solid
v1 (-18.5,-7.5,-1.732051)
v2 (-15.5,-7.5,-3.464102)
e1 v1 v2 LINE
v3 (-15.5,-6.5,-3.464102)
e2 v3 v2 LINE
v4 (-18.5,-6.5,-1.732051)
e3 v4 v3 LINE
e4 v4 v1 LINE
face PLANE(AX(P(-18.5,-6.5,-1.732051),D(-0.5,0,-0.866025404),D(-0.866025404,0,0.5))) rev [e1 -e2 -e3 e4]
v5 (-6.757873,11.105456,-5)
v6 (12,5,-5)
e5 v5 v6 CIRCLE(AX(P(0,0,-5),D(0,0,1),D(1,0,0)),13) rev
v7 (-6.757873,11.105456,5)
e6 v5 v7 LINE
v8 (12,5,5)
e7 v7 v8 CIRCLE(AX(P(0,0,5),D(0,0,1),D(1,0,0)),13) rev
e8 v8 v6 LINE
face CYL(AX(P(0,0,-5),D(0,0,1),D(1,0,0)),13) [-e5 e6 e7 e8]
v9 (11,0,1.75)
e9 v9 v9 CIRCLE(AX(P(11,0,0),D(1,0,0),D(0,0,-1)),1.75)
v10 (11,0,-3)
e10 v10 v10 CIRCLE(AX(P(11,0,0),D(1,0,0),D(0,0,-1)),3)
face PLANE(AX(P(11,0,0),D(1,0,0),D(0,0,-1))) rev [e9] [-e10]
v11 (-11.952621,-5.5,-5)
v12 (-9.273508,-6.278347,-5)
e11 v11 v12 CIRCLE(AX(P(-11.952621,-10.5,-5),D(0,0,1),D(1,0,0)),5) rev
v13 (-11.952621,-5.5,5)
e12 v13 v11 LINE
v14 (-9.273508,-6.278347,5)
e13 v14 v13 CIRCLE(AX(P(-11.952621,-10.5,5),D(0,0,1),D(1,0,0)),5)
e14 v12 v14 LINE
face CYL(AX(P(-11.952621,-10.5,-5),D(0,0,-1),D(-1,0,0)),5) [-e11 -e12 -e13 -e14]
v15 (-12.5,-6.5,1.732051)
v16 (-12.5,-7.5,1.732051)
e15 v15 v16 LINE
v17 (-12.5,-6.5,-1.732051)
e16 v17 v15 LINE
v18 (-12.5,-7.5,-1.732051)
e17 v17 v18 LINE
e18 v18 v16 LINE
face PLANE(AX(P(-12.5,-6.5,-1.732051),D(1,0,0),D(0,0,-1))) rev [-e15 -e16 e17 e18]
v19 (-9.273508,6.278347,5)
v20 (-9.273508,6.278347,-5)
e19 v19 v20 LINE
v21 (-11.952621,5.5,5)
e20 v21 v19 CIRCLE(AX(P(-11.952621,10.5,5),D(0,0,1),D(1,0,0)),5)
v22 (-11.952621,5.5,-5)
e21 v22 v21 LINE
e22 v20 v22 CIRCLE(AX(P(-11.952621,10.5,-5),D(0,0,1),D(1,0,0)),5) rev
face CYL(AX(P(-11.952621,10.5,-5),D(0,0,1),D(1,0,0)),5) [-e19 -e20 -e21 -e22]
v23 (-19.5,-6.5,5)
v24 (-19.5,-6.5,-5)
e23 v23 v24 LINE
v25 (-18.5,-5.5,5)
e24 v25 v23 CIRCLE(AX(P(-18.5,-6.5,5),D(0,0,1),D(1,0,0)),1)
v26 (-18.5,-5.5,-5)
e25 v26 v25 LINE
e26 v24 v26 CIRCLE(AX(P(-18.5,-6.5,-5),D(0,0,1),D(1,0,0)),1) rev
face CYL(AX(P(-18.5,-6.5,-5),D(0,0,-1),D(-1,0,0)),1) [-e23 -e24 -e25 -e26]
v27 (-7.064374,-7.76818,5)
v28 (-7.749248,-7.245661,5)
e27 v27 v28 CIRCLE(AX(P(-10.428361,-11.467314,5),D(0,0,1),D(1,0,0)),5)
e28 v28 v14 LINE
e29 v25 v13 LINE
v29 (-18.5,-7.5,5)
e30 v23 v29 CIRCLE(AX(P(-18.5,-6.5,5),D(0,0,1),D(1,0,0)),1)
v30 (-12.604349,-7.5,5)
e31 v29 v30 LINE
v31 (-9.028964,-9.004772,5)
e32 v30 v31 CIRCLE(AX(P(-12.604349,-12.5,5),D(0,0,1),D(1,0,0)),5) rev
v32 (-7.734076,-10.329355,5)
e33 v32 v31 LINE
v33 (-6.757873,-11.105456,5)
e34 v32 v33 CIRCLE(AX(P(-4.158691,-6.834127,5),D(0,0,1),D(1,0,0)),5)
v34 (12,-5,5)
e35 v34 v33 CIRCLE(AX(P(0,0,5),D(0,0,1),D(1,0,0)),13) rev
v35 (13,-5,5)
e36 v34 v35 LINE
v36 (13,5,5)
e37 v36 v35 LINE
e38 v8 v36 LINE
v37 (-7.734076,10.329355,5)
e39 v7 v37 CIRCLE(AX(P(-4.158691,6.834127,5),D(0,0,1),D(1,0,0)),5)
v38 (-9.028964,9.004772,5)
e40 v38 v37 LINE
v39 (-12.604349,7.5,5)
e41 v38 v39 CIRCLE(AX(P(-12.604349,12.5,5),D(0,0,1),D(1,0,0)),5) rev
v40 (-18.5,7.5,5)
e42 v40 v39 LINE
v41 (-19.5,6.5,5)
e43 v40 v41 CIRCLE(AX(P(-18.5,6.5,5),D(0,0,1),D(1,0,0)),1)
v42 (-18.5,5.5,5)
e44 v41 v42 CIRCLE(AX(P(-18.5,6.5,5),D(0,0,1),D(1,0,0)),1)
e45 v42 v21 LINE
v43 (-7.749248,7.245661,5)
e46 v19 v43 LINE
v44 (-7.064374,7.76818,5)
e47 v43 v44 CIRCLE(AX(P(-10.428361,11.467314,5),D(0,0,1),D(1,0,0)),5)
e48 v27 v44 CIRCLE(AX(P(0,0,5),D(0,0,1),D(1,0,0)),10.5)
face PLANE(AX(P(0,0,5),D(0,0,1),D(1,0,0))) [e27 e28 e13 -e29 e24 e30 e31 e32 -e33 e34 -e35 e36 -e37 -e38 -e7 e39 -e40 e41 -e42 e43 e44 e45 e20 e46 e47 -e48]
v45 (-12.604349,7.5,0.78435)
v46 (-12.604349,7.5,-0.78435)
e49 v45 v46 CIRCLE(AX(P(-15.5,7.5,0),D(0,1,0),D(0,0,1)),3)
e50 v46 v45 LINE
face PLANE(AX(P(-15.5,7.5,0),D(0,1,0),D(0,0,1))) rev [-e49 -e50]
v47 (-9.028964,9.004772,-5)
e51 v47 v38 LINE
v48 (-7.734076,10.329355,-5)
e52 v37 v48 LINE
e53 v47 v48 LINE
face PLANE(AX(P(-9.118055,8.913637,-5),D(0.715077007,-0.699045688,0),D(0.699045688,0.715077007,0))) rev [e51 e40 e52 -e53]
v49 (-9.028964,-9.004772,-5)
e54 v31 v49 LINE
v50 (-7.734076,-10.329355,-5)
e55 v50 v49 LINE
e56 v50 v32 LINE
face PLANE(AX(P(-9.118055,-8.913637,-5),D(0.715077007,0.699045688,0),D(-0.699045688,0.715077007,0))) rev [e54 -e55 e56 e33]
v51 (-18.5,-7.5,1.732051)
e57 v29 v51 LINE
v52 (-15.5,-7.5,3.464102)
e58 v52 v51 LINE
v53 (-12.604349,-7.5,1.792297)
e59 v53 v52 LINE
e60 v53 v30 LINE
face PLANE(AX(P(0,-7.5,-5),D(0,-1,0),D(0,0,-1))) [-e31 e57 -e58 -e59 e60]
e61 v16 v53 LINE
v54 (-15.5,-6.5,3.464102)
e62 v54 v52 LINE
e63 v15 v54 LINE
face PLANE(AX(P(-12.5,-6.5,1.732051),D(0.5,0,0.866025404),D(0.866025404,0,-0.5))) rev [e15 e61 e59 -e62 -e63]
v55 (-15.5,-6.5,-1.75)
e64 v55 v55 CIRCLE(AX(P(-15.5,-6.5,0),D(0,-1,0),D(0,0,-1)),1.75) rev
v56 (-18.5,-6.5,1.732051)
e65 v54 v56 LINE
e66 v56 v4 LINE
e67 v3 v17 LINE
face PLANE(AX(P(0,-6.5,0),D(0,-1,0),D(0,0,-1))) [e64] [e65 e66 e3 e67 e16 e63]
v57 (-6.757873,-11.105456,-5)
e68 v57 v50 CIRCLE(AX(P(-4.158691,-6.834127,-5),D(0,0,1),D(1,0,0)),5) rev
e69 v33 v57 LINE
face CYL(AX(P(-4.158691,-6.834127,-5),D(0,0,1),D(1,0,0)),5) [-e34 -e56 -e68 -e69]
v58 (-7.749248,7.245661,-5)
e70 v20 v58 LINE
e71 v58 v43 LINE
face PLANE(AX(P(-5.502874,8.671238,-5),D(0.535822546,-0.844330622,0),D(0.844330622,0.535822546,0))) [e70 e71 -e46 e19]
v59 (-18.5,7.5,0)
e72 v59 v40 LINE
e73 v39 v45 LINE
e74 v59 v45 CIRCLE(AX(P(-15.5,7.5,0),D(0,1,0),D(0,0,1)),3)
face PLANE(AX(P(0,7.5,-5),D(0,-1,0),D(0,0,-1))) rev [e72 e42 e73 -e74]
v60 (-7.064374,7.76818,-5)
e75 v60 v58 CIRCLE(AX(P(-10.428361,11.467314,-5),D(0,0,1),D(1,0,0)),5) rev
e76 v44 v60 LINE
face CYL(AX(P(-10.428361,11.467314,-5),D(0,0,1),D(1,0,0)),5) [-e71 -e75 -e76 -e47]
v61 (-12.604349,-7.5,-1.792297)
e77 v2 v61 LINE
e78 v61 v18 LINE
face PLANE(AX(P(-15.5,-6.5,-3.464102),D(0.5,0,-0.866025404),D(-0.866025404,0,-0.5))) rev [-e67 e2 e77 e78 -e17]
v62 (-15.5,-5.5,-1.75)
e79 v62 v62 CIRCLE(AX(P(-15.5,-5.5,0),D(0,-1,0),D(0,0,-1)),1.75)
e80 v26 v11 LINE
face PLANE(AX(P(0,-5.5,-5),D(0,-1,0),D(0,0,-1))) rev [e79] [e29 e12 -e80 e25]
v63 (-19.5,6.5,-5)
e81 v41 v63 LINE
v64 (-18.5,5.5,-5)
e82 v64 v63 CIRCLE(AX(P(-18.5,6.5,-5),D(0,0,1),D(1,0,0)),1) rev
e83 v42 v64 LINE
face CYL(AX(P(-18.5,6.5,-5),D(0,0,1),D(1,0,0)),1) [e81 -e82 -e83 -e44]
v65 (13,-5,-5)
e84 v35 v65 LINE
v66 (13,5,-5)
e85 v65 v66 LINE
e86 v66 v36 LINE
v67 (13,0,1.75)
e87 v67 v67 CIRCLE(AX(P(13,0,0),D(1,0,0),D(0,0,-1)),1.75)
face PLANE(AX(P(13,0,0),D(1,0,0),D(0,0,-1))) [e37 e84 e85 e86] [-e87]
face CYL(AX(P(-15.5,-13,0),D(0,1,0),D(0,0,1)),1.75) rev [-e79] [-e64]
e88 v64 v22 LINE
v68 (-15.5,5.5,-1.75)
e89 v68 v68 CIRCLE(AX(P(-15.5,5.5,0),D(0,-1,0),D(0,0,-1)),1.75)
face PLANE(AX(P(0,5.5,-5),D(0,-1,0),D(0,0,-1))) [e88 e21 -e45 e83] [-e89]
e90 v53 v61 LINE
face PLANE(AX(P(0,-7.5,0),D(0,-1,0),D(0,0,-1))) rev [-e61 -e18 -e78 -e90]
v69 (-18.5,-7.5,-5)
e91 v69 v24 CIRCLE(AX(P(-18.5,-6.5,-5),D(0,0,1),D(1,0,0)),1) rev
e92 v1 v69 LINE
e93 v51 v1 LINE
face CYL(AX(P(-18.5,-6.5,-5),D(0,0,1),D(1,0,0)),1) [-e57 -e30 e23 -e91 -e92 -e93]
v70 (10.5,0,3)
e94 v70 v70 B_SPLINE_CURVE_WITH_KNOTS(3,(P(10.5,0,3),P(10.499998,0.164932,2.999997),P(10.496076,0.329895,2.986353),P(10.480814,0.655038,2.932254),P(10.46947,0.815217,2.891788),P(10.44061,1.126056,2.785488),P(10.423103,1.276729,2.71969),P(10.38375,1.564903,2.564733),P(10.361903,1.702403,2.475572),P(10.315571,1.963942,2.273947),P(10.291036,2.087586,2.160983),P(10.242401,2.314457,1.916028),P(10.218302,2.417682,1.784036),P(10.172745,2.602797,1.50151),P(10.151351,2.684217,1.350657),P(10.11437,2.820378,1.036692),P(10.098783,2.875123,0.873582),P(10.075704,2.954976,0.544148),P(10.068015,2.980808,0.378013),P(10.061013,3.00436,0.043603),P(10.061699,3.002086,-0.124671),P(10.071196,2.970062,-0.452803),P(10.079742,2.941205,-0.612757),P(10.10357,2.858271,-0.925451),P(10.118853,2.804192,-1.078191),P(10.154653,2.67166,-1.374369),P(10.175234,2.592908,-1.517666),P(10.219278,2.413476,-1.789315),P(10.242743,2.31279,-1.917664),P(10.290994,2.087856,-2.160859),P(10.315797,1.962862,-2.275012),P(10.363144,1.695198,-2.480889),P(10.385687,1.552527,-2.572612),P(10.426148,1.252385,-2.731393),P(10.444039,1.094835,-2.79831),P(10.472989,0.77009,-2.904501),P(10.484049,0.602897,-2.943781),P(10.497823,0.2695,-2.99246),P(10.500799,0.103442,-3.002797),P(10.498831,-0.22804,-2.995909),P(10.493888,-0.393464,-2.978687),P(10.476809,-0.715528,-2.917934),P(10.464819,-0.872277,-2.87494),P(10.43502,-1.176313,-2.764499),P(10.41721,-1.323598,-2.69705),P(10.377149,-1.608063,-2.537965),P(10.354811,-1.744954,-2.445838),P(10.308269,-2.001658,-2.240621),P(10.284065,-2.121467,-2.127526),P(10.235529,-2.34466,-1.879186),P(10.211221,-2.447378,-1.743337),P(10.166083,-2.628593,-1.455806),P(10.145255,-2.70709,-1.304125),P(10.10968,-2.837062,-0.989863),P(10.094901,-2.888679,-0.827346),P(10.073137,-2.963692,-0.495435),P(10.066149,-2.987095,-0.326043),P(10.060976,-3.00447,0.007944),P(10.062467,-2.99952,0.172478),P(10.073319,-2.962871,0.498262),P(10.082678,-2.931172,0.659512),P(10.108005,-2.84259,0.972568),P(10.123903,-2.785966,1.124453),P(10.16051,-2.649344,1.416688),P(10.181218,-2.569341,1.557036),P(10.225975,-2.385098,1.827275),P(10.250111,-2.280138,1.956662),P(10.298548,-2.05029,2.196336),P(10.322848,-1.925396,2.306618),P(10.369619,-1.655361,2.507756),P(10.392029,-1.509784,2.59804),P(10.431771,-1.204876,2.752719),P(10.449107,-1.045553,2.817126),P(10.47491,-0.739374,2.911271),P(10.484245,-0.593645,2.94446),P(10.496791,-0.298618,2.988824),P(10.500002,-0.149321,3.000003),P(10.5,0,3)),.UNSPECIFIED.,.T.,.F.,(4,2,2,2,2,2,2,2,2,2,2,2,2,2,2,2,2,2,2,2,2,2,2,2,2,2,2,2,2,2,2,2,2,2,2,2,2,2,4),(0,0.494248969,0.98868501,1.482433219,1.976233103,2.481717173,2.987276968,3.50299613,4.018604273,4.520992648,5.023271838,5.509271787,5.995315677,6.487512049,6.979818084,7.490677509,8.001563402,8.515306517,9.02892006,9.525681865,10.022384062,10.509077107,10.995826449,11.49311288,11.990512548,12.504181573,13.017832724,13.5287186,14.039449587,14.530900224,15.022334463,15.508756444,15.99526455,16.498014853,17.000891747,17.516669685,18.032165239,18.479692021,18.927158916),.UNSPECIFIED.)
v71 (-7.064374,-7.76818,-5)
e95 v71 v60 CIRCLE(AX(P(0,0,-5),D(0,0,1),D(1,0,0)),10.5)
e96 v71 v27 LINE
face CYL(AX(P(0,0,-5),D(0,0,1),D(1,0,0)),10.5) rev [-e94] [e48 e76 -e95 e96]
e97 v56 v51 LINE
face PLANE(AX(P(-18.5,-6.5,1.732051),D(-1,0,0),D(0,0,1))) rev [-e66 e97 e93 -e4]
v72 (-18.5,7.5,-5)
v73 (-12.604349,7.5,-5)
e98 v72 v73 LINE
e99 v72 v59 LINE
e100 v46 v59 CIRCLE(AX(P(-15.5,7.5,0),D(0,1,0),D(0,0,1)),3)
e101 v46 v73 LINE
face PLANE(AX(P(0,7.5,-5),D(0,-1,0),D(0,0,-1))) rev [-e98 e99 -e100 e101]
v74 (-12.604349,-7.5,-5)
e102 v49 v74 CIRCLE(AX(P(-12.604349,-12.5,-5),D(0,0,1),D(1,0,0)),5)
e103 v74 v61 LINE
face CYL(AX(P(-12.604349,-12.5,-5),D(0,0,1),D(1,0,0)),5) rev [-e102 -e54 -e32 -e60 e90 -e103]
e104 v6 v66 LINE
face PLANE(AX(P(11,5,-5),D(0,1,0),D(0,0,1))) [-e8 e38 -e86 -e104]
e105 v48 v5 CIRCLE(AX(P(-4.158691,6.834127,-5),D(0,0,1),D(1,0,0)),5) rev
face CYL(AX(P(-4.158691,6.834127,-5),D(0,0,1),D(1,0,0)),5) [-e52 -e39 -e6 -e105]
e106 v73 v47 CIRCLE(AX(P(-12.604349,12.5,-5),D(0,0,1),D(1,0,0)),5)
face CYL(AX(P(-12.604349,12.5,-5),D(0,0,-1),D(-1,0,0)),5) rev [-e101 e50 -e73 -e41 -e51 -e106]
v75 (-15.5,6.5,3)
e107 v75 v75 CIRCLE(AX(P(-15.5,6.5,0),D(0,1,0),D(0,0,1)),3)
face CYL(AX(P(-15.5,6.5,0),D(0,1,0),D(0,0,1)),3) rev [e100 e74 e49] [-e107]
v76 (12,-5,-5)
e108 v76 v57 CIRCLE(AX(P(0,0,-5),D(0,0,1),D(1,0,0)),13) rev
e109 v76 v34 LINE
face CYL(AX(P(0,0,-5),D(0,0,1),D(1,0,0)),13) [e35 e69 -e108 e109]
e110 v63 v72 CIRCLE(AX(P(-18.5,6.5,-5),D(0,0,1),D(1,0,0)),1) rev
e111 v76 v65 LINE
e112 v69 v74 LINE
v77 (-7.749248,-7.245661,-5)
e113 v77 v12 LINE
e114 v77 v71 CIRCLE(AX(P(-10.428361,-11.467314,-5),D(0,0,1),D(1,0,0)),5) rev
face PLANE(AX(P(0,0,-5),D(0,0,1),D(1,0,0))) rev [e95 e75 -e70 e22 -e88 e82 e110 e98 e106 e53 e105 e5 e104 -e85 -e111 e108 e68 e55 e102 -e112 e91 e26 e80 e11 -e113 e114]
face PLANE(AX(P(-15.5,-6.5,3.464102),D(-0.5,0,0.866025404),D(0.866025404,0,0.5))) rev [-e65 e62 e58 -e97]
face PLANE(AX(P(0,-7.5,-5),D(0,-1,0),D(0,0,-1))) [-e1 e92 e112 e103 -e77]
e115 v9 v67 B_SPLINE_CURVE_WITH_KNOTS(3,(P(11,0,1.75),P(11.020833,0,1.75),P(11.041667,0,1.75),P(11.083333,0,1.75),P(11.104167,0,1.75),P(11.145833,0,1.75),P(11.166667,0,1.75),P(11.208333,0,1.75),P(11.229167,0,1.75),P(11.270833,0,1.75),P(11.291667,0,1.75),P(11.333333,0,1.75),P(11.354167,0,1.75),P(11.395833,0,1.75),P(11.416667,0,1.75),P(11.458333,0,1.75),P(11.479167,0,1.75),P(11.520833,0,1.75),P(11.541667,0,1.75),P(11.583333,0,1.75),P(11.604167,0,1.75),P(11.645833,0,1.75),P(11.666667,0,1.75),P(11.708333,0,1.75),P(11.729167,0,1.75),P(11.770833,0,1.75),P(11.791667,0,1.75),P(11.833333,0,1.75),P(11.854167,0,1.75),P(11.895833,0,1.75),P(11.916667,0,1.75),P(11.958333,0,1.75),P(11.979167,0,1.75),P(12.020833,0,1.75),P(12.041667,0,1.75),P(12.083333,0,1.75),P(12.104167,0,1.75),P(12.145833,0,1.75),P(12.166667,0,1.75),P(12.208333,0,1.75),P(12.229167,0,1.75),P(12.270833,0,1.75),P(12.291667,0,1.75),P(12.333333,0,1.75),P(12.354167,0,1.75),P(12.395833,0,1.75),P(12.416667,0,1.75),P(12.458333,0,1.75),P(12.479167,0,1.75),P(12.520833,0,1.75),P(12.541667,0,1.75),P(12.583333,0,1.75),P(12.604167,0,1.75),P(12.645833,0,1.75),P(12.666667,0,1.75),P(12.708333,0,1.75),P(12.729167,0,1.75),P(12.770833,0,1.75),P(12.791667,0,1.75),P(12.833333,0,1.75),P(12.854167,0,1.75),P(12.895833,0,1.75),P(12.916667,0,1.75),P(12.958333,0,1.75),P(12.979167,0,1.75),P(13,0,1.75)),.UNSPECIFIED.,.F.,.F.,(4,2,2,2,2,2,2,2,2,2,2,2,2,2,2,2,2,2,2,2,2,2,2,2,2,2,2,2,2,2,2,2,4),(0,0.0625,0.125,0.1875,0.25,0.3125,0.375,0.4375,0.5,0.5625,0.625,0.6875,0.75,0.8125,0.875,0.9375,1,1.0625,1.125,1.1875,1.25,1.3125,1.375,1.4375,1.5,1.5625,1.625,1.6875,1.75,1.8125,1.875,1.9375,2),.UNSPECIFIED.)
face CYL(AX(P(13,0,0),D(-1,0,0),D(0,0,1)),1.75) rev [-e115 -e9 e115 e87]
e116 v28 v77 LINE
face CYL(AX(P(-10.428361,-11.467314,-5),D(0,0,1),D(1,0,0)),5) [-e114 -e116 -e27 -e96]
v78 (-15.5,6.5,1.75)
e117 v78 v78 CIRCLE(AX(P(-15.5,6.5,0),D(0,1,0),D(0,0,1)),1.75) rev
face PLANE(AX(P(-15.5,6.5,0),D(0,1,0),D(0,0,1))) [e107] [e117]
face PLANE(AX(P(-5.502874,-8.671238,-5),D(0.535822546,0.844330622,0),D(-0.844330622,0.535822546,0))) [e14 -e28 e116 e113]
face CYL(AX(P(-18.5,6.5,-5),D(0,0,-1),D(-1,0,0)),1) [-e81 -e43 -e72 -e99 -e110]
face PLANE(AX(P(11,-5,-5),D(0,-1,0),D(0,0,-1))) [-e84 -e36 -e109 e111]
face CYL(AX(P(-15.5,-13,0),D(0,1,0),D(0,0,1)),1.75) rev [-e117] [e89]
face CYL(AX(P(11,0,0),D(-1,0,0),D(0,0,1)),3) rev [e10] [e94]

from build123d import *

# Parameters (mm, degrees)
EXTRUDE_1_DEPTH      = 5
EXTRUDE_1_DEPTH_BACK = 5
SKETCH_367_W         = 9
SKETCH_367_H         = 2
FILLET_1_R           = 5
FILLET_2_R           = 1
SKETCH_1_R           = 1.75
CUT_EXTRUDE_2_DEPTH  = 29.731515797
SKETCH_1_6_R         = 3
CUT_EXTRUDE_3_DEPTH  = 1
SKETCH_5_W           = 10
SKETCH_5_H           = 10
EXTRUDE_2_DEPTH      = 2
SKETCH_6_R           = 1.75
CUT_EXTRUDE_5_DEPTH  = 24.963513933
SKETCH_6_3_R         = 3
CUT_EXTRUDE_6_DEPTH  = 11
CUT_EXTRUDE_7_DEPTH  = 1


with BuildPart() as part:
    # Sketch 367 → Бобышка-Вытянуть1 (new, two sides: drawn at the far end of the back side and taken through both)
    with BuildSketch(Plane.XY.offset(-EXTRUDE_1_DEPTH_BACK)):
        with BuildLine():
            ThreePointArc((-7.348469228, 10.723805295), (13, 0), (-7.348469228, -10.723805295))
            Line((-7.348469228, -10.723805295), (-10.5, -7.5))
            Line((-10.5, -7.5), (-10.5, -5.5))
            Line((-10.5, -5.5), (-7.348469228, -7.5))
            ThreePointArc((-7.348469228, -7.5), (10.5, 0), (-7.348469228, 7.5))
            Line((-7.348469228, 7.5), (-10.5, 5.5))
            Line((-10.5, 5.5), (-10.5, 7.5))
            Line((-10.5, 7.5), (-7.348469228, 10.723805295))
        make_face()
        with Locations((-15, 6.5)):
            Rectangle(SKETCH_367_W, SKETCH_367_H)
        with Locations((-15, -6.5)):
            Rectangle(SKETCH_367_W, SKETCH_367_H)
    extrude(amount=EXTRUDE_1_DEPTH + EXTRUDE_1_DEPTH_BACK)

    # Скругление1
    fillet_1_edges = [part.edges().sort_by_distance(p)[0] for p in [
        (-7.348469228, -10.723805295, 0),
        (-10.5, -7.5, 0),
        (-10.5, -5.5, 0),
        (-7.348469228, -7.5, 0),
        (-7.348469228, 7.5, 0),
        (-10.5, 5.5, 0),
        (-10.5, 7.5, 0),
        (-7.348469228, 10.723805295, 0),
    ]]
    fillet(fillet_1_edges, radius=FILLET_1_R)

    # Скругление2
    fillet_2_edges = [part.edges().sort_by_distance(p)[0] for p in [
        (-19.5, -7.5, 0),
        (-19.5, -5.5, 0),
        (-19.5, 5.5, 0),
        (-19.5, 7.5, 0),
    ]]
    fillet(fillet_2_edges, radius=FILLET_2_R - 0.0001)  # a hair under: the kernel refuses the full size

    # Эскиз1 → Вырез-Вытянуть2 (cut, through all)
    with BuildSketch(Plane(origin=(0, 7.5, 0), x_dir=(1, 0, 0), z_dir=(0, 1, 0))):
        with Locations(Location((-15.5, 0, 0), (0, 0, 270))):
            Circle(SKETCH_1_R)
    extrude(amount=-CUT_EXTRUDE_2_DEPTH, mode=Mode.SUBTRACT)

    # Эскиз1<6> → Вырез-Вытянуть3 (cut)
    with BuildSketch(Plane(origin=(0, 7.5, 0), x_dir=(1, 0, 0), z_dir=(0, 1, 0))):
        with Locations(Location((-15.5, 0, 0), (0, 0, 270))):
            Circle(SKETCH_1_6_R)
    extrude(amount=-CUT_EXTRUDE_3_DEPTH, mode=Mode.SUBTRACT)

    # Эскиз5 → Бобышка-Вытянуть2 (add)
    with BuildSketch(Plane(origin=(13, 0, 0), x_dir=(0, 0, -1), z_dir=(1, 0, 0))):
        Rectangle(SKETCH_5_W, SKETCH_5_H)
    extrude(amount=-EXTRUDE_2_DEPTH)

    # Эскиз6 → Вырез-Вытянуть5 (cut, through all)
    with BuildSketch(Plane(origin=(0, 0, 0), x_dir=(0, 0, -1), z_dir=(1, 0, 0))):
        with Locations(Location((0, 0, 0), (0, 0, 180))):
            Circle(SKETCH_6_R)
    extrude(amount=CUT_EXTRUDE_5_DEPTH, mode=Mode.SUBTRACT)

    # Эскиз6<3> → Вырез-Вытянуть6 (cut)
    with BuildSketch(Plane(origin=(0, 0, 0), x_dir=(0, 0, -1), z_dir=(1, 0, 0))):
        with Locations(Location((0, 0, 0), (0, 0, 180))):
            Circle(SKETCH_6_3_R)
    extrude(amount=CUT_EXTRUDE_6_DEPTH, mode=Mode.SUBTRACT)

    # Эскиз8 → Вырез-Вытянуть7 (cut)
    with BuildSketch(Plane.XZ.offset(7.5)):
        Polygon((-15.5, 3.464101615), (-18.5, 1.732050808), (-18.5, -1.732050808), (-15.5, -3.464101615), (-12.5, -1.732050808), (-12.5, 1.732050808), align=None)
    extrude(amount=-CUT_EXTRUDE_7_DEPTH, mode=Mode.SUBTRACT)


solid = part.part
